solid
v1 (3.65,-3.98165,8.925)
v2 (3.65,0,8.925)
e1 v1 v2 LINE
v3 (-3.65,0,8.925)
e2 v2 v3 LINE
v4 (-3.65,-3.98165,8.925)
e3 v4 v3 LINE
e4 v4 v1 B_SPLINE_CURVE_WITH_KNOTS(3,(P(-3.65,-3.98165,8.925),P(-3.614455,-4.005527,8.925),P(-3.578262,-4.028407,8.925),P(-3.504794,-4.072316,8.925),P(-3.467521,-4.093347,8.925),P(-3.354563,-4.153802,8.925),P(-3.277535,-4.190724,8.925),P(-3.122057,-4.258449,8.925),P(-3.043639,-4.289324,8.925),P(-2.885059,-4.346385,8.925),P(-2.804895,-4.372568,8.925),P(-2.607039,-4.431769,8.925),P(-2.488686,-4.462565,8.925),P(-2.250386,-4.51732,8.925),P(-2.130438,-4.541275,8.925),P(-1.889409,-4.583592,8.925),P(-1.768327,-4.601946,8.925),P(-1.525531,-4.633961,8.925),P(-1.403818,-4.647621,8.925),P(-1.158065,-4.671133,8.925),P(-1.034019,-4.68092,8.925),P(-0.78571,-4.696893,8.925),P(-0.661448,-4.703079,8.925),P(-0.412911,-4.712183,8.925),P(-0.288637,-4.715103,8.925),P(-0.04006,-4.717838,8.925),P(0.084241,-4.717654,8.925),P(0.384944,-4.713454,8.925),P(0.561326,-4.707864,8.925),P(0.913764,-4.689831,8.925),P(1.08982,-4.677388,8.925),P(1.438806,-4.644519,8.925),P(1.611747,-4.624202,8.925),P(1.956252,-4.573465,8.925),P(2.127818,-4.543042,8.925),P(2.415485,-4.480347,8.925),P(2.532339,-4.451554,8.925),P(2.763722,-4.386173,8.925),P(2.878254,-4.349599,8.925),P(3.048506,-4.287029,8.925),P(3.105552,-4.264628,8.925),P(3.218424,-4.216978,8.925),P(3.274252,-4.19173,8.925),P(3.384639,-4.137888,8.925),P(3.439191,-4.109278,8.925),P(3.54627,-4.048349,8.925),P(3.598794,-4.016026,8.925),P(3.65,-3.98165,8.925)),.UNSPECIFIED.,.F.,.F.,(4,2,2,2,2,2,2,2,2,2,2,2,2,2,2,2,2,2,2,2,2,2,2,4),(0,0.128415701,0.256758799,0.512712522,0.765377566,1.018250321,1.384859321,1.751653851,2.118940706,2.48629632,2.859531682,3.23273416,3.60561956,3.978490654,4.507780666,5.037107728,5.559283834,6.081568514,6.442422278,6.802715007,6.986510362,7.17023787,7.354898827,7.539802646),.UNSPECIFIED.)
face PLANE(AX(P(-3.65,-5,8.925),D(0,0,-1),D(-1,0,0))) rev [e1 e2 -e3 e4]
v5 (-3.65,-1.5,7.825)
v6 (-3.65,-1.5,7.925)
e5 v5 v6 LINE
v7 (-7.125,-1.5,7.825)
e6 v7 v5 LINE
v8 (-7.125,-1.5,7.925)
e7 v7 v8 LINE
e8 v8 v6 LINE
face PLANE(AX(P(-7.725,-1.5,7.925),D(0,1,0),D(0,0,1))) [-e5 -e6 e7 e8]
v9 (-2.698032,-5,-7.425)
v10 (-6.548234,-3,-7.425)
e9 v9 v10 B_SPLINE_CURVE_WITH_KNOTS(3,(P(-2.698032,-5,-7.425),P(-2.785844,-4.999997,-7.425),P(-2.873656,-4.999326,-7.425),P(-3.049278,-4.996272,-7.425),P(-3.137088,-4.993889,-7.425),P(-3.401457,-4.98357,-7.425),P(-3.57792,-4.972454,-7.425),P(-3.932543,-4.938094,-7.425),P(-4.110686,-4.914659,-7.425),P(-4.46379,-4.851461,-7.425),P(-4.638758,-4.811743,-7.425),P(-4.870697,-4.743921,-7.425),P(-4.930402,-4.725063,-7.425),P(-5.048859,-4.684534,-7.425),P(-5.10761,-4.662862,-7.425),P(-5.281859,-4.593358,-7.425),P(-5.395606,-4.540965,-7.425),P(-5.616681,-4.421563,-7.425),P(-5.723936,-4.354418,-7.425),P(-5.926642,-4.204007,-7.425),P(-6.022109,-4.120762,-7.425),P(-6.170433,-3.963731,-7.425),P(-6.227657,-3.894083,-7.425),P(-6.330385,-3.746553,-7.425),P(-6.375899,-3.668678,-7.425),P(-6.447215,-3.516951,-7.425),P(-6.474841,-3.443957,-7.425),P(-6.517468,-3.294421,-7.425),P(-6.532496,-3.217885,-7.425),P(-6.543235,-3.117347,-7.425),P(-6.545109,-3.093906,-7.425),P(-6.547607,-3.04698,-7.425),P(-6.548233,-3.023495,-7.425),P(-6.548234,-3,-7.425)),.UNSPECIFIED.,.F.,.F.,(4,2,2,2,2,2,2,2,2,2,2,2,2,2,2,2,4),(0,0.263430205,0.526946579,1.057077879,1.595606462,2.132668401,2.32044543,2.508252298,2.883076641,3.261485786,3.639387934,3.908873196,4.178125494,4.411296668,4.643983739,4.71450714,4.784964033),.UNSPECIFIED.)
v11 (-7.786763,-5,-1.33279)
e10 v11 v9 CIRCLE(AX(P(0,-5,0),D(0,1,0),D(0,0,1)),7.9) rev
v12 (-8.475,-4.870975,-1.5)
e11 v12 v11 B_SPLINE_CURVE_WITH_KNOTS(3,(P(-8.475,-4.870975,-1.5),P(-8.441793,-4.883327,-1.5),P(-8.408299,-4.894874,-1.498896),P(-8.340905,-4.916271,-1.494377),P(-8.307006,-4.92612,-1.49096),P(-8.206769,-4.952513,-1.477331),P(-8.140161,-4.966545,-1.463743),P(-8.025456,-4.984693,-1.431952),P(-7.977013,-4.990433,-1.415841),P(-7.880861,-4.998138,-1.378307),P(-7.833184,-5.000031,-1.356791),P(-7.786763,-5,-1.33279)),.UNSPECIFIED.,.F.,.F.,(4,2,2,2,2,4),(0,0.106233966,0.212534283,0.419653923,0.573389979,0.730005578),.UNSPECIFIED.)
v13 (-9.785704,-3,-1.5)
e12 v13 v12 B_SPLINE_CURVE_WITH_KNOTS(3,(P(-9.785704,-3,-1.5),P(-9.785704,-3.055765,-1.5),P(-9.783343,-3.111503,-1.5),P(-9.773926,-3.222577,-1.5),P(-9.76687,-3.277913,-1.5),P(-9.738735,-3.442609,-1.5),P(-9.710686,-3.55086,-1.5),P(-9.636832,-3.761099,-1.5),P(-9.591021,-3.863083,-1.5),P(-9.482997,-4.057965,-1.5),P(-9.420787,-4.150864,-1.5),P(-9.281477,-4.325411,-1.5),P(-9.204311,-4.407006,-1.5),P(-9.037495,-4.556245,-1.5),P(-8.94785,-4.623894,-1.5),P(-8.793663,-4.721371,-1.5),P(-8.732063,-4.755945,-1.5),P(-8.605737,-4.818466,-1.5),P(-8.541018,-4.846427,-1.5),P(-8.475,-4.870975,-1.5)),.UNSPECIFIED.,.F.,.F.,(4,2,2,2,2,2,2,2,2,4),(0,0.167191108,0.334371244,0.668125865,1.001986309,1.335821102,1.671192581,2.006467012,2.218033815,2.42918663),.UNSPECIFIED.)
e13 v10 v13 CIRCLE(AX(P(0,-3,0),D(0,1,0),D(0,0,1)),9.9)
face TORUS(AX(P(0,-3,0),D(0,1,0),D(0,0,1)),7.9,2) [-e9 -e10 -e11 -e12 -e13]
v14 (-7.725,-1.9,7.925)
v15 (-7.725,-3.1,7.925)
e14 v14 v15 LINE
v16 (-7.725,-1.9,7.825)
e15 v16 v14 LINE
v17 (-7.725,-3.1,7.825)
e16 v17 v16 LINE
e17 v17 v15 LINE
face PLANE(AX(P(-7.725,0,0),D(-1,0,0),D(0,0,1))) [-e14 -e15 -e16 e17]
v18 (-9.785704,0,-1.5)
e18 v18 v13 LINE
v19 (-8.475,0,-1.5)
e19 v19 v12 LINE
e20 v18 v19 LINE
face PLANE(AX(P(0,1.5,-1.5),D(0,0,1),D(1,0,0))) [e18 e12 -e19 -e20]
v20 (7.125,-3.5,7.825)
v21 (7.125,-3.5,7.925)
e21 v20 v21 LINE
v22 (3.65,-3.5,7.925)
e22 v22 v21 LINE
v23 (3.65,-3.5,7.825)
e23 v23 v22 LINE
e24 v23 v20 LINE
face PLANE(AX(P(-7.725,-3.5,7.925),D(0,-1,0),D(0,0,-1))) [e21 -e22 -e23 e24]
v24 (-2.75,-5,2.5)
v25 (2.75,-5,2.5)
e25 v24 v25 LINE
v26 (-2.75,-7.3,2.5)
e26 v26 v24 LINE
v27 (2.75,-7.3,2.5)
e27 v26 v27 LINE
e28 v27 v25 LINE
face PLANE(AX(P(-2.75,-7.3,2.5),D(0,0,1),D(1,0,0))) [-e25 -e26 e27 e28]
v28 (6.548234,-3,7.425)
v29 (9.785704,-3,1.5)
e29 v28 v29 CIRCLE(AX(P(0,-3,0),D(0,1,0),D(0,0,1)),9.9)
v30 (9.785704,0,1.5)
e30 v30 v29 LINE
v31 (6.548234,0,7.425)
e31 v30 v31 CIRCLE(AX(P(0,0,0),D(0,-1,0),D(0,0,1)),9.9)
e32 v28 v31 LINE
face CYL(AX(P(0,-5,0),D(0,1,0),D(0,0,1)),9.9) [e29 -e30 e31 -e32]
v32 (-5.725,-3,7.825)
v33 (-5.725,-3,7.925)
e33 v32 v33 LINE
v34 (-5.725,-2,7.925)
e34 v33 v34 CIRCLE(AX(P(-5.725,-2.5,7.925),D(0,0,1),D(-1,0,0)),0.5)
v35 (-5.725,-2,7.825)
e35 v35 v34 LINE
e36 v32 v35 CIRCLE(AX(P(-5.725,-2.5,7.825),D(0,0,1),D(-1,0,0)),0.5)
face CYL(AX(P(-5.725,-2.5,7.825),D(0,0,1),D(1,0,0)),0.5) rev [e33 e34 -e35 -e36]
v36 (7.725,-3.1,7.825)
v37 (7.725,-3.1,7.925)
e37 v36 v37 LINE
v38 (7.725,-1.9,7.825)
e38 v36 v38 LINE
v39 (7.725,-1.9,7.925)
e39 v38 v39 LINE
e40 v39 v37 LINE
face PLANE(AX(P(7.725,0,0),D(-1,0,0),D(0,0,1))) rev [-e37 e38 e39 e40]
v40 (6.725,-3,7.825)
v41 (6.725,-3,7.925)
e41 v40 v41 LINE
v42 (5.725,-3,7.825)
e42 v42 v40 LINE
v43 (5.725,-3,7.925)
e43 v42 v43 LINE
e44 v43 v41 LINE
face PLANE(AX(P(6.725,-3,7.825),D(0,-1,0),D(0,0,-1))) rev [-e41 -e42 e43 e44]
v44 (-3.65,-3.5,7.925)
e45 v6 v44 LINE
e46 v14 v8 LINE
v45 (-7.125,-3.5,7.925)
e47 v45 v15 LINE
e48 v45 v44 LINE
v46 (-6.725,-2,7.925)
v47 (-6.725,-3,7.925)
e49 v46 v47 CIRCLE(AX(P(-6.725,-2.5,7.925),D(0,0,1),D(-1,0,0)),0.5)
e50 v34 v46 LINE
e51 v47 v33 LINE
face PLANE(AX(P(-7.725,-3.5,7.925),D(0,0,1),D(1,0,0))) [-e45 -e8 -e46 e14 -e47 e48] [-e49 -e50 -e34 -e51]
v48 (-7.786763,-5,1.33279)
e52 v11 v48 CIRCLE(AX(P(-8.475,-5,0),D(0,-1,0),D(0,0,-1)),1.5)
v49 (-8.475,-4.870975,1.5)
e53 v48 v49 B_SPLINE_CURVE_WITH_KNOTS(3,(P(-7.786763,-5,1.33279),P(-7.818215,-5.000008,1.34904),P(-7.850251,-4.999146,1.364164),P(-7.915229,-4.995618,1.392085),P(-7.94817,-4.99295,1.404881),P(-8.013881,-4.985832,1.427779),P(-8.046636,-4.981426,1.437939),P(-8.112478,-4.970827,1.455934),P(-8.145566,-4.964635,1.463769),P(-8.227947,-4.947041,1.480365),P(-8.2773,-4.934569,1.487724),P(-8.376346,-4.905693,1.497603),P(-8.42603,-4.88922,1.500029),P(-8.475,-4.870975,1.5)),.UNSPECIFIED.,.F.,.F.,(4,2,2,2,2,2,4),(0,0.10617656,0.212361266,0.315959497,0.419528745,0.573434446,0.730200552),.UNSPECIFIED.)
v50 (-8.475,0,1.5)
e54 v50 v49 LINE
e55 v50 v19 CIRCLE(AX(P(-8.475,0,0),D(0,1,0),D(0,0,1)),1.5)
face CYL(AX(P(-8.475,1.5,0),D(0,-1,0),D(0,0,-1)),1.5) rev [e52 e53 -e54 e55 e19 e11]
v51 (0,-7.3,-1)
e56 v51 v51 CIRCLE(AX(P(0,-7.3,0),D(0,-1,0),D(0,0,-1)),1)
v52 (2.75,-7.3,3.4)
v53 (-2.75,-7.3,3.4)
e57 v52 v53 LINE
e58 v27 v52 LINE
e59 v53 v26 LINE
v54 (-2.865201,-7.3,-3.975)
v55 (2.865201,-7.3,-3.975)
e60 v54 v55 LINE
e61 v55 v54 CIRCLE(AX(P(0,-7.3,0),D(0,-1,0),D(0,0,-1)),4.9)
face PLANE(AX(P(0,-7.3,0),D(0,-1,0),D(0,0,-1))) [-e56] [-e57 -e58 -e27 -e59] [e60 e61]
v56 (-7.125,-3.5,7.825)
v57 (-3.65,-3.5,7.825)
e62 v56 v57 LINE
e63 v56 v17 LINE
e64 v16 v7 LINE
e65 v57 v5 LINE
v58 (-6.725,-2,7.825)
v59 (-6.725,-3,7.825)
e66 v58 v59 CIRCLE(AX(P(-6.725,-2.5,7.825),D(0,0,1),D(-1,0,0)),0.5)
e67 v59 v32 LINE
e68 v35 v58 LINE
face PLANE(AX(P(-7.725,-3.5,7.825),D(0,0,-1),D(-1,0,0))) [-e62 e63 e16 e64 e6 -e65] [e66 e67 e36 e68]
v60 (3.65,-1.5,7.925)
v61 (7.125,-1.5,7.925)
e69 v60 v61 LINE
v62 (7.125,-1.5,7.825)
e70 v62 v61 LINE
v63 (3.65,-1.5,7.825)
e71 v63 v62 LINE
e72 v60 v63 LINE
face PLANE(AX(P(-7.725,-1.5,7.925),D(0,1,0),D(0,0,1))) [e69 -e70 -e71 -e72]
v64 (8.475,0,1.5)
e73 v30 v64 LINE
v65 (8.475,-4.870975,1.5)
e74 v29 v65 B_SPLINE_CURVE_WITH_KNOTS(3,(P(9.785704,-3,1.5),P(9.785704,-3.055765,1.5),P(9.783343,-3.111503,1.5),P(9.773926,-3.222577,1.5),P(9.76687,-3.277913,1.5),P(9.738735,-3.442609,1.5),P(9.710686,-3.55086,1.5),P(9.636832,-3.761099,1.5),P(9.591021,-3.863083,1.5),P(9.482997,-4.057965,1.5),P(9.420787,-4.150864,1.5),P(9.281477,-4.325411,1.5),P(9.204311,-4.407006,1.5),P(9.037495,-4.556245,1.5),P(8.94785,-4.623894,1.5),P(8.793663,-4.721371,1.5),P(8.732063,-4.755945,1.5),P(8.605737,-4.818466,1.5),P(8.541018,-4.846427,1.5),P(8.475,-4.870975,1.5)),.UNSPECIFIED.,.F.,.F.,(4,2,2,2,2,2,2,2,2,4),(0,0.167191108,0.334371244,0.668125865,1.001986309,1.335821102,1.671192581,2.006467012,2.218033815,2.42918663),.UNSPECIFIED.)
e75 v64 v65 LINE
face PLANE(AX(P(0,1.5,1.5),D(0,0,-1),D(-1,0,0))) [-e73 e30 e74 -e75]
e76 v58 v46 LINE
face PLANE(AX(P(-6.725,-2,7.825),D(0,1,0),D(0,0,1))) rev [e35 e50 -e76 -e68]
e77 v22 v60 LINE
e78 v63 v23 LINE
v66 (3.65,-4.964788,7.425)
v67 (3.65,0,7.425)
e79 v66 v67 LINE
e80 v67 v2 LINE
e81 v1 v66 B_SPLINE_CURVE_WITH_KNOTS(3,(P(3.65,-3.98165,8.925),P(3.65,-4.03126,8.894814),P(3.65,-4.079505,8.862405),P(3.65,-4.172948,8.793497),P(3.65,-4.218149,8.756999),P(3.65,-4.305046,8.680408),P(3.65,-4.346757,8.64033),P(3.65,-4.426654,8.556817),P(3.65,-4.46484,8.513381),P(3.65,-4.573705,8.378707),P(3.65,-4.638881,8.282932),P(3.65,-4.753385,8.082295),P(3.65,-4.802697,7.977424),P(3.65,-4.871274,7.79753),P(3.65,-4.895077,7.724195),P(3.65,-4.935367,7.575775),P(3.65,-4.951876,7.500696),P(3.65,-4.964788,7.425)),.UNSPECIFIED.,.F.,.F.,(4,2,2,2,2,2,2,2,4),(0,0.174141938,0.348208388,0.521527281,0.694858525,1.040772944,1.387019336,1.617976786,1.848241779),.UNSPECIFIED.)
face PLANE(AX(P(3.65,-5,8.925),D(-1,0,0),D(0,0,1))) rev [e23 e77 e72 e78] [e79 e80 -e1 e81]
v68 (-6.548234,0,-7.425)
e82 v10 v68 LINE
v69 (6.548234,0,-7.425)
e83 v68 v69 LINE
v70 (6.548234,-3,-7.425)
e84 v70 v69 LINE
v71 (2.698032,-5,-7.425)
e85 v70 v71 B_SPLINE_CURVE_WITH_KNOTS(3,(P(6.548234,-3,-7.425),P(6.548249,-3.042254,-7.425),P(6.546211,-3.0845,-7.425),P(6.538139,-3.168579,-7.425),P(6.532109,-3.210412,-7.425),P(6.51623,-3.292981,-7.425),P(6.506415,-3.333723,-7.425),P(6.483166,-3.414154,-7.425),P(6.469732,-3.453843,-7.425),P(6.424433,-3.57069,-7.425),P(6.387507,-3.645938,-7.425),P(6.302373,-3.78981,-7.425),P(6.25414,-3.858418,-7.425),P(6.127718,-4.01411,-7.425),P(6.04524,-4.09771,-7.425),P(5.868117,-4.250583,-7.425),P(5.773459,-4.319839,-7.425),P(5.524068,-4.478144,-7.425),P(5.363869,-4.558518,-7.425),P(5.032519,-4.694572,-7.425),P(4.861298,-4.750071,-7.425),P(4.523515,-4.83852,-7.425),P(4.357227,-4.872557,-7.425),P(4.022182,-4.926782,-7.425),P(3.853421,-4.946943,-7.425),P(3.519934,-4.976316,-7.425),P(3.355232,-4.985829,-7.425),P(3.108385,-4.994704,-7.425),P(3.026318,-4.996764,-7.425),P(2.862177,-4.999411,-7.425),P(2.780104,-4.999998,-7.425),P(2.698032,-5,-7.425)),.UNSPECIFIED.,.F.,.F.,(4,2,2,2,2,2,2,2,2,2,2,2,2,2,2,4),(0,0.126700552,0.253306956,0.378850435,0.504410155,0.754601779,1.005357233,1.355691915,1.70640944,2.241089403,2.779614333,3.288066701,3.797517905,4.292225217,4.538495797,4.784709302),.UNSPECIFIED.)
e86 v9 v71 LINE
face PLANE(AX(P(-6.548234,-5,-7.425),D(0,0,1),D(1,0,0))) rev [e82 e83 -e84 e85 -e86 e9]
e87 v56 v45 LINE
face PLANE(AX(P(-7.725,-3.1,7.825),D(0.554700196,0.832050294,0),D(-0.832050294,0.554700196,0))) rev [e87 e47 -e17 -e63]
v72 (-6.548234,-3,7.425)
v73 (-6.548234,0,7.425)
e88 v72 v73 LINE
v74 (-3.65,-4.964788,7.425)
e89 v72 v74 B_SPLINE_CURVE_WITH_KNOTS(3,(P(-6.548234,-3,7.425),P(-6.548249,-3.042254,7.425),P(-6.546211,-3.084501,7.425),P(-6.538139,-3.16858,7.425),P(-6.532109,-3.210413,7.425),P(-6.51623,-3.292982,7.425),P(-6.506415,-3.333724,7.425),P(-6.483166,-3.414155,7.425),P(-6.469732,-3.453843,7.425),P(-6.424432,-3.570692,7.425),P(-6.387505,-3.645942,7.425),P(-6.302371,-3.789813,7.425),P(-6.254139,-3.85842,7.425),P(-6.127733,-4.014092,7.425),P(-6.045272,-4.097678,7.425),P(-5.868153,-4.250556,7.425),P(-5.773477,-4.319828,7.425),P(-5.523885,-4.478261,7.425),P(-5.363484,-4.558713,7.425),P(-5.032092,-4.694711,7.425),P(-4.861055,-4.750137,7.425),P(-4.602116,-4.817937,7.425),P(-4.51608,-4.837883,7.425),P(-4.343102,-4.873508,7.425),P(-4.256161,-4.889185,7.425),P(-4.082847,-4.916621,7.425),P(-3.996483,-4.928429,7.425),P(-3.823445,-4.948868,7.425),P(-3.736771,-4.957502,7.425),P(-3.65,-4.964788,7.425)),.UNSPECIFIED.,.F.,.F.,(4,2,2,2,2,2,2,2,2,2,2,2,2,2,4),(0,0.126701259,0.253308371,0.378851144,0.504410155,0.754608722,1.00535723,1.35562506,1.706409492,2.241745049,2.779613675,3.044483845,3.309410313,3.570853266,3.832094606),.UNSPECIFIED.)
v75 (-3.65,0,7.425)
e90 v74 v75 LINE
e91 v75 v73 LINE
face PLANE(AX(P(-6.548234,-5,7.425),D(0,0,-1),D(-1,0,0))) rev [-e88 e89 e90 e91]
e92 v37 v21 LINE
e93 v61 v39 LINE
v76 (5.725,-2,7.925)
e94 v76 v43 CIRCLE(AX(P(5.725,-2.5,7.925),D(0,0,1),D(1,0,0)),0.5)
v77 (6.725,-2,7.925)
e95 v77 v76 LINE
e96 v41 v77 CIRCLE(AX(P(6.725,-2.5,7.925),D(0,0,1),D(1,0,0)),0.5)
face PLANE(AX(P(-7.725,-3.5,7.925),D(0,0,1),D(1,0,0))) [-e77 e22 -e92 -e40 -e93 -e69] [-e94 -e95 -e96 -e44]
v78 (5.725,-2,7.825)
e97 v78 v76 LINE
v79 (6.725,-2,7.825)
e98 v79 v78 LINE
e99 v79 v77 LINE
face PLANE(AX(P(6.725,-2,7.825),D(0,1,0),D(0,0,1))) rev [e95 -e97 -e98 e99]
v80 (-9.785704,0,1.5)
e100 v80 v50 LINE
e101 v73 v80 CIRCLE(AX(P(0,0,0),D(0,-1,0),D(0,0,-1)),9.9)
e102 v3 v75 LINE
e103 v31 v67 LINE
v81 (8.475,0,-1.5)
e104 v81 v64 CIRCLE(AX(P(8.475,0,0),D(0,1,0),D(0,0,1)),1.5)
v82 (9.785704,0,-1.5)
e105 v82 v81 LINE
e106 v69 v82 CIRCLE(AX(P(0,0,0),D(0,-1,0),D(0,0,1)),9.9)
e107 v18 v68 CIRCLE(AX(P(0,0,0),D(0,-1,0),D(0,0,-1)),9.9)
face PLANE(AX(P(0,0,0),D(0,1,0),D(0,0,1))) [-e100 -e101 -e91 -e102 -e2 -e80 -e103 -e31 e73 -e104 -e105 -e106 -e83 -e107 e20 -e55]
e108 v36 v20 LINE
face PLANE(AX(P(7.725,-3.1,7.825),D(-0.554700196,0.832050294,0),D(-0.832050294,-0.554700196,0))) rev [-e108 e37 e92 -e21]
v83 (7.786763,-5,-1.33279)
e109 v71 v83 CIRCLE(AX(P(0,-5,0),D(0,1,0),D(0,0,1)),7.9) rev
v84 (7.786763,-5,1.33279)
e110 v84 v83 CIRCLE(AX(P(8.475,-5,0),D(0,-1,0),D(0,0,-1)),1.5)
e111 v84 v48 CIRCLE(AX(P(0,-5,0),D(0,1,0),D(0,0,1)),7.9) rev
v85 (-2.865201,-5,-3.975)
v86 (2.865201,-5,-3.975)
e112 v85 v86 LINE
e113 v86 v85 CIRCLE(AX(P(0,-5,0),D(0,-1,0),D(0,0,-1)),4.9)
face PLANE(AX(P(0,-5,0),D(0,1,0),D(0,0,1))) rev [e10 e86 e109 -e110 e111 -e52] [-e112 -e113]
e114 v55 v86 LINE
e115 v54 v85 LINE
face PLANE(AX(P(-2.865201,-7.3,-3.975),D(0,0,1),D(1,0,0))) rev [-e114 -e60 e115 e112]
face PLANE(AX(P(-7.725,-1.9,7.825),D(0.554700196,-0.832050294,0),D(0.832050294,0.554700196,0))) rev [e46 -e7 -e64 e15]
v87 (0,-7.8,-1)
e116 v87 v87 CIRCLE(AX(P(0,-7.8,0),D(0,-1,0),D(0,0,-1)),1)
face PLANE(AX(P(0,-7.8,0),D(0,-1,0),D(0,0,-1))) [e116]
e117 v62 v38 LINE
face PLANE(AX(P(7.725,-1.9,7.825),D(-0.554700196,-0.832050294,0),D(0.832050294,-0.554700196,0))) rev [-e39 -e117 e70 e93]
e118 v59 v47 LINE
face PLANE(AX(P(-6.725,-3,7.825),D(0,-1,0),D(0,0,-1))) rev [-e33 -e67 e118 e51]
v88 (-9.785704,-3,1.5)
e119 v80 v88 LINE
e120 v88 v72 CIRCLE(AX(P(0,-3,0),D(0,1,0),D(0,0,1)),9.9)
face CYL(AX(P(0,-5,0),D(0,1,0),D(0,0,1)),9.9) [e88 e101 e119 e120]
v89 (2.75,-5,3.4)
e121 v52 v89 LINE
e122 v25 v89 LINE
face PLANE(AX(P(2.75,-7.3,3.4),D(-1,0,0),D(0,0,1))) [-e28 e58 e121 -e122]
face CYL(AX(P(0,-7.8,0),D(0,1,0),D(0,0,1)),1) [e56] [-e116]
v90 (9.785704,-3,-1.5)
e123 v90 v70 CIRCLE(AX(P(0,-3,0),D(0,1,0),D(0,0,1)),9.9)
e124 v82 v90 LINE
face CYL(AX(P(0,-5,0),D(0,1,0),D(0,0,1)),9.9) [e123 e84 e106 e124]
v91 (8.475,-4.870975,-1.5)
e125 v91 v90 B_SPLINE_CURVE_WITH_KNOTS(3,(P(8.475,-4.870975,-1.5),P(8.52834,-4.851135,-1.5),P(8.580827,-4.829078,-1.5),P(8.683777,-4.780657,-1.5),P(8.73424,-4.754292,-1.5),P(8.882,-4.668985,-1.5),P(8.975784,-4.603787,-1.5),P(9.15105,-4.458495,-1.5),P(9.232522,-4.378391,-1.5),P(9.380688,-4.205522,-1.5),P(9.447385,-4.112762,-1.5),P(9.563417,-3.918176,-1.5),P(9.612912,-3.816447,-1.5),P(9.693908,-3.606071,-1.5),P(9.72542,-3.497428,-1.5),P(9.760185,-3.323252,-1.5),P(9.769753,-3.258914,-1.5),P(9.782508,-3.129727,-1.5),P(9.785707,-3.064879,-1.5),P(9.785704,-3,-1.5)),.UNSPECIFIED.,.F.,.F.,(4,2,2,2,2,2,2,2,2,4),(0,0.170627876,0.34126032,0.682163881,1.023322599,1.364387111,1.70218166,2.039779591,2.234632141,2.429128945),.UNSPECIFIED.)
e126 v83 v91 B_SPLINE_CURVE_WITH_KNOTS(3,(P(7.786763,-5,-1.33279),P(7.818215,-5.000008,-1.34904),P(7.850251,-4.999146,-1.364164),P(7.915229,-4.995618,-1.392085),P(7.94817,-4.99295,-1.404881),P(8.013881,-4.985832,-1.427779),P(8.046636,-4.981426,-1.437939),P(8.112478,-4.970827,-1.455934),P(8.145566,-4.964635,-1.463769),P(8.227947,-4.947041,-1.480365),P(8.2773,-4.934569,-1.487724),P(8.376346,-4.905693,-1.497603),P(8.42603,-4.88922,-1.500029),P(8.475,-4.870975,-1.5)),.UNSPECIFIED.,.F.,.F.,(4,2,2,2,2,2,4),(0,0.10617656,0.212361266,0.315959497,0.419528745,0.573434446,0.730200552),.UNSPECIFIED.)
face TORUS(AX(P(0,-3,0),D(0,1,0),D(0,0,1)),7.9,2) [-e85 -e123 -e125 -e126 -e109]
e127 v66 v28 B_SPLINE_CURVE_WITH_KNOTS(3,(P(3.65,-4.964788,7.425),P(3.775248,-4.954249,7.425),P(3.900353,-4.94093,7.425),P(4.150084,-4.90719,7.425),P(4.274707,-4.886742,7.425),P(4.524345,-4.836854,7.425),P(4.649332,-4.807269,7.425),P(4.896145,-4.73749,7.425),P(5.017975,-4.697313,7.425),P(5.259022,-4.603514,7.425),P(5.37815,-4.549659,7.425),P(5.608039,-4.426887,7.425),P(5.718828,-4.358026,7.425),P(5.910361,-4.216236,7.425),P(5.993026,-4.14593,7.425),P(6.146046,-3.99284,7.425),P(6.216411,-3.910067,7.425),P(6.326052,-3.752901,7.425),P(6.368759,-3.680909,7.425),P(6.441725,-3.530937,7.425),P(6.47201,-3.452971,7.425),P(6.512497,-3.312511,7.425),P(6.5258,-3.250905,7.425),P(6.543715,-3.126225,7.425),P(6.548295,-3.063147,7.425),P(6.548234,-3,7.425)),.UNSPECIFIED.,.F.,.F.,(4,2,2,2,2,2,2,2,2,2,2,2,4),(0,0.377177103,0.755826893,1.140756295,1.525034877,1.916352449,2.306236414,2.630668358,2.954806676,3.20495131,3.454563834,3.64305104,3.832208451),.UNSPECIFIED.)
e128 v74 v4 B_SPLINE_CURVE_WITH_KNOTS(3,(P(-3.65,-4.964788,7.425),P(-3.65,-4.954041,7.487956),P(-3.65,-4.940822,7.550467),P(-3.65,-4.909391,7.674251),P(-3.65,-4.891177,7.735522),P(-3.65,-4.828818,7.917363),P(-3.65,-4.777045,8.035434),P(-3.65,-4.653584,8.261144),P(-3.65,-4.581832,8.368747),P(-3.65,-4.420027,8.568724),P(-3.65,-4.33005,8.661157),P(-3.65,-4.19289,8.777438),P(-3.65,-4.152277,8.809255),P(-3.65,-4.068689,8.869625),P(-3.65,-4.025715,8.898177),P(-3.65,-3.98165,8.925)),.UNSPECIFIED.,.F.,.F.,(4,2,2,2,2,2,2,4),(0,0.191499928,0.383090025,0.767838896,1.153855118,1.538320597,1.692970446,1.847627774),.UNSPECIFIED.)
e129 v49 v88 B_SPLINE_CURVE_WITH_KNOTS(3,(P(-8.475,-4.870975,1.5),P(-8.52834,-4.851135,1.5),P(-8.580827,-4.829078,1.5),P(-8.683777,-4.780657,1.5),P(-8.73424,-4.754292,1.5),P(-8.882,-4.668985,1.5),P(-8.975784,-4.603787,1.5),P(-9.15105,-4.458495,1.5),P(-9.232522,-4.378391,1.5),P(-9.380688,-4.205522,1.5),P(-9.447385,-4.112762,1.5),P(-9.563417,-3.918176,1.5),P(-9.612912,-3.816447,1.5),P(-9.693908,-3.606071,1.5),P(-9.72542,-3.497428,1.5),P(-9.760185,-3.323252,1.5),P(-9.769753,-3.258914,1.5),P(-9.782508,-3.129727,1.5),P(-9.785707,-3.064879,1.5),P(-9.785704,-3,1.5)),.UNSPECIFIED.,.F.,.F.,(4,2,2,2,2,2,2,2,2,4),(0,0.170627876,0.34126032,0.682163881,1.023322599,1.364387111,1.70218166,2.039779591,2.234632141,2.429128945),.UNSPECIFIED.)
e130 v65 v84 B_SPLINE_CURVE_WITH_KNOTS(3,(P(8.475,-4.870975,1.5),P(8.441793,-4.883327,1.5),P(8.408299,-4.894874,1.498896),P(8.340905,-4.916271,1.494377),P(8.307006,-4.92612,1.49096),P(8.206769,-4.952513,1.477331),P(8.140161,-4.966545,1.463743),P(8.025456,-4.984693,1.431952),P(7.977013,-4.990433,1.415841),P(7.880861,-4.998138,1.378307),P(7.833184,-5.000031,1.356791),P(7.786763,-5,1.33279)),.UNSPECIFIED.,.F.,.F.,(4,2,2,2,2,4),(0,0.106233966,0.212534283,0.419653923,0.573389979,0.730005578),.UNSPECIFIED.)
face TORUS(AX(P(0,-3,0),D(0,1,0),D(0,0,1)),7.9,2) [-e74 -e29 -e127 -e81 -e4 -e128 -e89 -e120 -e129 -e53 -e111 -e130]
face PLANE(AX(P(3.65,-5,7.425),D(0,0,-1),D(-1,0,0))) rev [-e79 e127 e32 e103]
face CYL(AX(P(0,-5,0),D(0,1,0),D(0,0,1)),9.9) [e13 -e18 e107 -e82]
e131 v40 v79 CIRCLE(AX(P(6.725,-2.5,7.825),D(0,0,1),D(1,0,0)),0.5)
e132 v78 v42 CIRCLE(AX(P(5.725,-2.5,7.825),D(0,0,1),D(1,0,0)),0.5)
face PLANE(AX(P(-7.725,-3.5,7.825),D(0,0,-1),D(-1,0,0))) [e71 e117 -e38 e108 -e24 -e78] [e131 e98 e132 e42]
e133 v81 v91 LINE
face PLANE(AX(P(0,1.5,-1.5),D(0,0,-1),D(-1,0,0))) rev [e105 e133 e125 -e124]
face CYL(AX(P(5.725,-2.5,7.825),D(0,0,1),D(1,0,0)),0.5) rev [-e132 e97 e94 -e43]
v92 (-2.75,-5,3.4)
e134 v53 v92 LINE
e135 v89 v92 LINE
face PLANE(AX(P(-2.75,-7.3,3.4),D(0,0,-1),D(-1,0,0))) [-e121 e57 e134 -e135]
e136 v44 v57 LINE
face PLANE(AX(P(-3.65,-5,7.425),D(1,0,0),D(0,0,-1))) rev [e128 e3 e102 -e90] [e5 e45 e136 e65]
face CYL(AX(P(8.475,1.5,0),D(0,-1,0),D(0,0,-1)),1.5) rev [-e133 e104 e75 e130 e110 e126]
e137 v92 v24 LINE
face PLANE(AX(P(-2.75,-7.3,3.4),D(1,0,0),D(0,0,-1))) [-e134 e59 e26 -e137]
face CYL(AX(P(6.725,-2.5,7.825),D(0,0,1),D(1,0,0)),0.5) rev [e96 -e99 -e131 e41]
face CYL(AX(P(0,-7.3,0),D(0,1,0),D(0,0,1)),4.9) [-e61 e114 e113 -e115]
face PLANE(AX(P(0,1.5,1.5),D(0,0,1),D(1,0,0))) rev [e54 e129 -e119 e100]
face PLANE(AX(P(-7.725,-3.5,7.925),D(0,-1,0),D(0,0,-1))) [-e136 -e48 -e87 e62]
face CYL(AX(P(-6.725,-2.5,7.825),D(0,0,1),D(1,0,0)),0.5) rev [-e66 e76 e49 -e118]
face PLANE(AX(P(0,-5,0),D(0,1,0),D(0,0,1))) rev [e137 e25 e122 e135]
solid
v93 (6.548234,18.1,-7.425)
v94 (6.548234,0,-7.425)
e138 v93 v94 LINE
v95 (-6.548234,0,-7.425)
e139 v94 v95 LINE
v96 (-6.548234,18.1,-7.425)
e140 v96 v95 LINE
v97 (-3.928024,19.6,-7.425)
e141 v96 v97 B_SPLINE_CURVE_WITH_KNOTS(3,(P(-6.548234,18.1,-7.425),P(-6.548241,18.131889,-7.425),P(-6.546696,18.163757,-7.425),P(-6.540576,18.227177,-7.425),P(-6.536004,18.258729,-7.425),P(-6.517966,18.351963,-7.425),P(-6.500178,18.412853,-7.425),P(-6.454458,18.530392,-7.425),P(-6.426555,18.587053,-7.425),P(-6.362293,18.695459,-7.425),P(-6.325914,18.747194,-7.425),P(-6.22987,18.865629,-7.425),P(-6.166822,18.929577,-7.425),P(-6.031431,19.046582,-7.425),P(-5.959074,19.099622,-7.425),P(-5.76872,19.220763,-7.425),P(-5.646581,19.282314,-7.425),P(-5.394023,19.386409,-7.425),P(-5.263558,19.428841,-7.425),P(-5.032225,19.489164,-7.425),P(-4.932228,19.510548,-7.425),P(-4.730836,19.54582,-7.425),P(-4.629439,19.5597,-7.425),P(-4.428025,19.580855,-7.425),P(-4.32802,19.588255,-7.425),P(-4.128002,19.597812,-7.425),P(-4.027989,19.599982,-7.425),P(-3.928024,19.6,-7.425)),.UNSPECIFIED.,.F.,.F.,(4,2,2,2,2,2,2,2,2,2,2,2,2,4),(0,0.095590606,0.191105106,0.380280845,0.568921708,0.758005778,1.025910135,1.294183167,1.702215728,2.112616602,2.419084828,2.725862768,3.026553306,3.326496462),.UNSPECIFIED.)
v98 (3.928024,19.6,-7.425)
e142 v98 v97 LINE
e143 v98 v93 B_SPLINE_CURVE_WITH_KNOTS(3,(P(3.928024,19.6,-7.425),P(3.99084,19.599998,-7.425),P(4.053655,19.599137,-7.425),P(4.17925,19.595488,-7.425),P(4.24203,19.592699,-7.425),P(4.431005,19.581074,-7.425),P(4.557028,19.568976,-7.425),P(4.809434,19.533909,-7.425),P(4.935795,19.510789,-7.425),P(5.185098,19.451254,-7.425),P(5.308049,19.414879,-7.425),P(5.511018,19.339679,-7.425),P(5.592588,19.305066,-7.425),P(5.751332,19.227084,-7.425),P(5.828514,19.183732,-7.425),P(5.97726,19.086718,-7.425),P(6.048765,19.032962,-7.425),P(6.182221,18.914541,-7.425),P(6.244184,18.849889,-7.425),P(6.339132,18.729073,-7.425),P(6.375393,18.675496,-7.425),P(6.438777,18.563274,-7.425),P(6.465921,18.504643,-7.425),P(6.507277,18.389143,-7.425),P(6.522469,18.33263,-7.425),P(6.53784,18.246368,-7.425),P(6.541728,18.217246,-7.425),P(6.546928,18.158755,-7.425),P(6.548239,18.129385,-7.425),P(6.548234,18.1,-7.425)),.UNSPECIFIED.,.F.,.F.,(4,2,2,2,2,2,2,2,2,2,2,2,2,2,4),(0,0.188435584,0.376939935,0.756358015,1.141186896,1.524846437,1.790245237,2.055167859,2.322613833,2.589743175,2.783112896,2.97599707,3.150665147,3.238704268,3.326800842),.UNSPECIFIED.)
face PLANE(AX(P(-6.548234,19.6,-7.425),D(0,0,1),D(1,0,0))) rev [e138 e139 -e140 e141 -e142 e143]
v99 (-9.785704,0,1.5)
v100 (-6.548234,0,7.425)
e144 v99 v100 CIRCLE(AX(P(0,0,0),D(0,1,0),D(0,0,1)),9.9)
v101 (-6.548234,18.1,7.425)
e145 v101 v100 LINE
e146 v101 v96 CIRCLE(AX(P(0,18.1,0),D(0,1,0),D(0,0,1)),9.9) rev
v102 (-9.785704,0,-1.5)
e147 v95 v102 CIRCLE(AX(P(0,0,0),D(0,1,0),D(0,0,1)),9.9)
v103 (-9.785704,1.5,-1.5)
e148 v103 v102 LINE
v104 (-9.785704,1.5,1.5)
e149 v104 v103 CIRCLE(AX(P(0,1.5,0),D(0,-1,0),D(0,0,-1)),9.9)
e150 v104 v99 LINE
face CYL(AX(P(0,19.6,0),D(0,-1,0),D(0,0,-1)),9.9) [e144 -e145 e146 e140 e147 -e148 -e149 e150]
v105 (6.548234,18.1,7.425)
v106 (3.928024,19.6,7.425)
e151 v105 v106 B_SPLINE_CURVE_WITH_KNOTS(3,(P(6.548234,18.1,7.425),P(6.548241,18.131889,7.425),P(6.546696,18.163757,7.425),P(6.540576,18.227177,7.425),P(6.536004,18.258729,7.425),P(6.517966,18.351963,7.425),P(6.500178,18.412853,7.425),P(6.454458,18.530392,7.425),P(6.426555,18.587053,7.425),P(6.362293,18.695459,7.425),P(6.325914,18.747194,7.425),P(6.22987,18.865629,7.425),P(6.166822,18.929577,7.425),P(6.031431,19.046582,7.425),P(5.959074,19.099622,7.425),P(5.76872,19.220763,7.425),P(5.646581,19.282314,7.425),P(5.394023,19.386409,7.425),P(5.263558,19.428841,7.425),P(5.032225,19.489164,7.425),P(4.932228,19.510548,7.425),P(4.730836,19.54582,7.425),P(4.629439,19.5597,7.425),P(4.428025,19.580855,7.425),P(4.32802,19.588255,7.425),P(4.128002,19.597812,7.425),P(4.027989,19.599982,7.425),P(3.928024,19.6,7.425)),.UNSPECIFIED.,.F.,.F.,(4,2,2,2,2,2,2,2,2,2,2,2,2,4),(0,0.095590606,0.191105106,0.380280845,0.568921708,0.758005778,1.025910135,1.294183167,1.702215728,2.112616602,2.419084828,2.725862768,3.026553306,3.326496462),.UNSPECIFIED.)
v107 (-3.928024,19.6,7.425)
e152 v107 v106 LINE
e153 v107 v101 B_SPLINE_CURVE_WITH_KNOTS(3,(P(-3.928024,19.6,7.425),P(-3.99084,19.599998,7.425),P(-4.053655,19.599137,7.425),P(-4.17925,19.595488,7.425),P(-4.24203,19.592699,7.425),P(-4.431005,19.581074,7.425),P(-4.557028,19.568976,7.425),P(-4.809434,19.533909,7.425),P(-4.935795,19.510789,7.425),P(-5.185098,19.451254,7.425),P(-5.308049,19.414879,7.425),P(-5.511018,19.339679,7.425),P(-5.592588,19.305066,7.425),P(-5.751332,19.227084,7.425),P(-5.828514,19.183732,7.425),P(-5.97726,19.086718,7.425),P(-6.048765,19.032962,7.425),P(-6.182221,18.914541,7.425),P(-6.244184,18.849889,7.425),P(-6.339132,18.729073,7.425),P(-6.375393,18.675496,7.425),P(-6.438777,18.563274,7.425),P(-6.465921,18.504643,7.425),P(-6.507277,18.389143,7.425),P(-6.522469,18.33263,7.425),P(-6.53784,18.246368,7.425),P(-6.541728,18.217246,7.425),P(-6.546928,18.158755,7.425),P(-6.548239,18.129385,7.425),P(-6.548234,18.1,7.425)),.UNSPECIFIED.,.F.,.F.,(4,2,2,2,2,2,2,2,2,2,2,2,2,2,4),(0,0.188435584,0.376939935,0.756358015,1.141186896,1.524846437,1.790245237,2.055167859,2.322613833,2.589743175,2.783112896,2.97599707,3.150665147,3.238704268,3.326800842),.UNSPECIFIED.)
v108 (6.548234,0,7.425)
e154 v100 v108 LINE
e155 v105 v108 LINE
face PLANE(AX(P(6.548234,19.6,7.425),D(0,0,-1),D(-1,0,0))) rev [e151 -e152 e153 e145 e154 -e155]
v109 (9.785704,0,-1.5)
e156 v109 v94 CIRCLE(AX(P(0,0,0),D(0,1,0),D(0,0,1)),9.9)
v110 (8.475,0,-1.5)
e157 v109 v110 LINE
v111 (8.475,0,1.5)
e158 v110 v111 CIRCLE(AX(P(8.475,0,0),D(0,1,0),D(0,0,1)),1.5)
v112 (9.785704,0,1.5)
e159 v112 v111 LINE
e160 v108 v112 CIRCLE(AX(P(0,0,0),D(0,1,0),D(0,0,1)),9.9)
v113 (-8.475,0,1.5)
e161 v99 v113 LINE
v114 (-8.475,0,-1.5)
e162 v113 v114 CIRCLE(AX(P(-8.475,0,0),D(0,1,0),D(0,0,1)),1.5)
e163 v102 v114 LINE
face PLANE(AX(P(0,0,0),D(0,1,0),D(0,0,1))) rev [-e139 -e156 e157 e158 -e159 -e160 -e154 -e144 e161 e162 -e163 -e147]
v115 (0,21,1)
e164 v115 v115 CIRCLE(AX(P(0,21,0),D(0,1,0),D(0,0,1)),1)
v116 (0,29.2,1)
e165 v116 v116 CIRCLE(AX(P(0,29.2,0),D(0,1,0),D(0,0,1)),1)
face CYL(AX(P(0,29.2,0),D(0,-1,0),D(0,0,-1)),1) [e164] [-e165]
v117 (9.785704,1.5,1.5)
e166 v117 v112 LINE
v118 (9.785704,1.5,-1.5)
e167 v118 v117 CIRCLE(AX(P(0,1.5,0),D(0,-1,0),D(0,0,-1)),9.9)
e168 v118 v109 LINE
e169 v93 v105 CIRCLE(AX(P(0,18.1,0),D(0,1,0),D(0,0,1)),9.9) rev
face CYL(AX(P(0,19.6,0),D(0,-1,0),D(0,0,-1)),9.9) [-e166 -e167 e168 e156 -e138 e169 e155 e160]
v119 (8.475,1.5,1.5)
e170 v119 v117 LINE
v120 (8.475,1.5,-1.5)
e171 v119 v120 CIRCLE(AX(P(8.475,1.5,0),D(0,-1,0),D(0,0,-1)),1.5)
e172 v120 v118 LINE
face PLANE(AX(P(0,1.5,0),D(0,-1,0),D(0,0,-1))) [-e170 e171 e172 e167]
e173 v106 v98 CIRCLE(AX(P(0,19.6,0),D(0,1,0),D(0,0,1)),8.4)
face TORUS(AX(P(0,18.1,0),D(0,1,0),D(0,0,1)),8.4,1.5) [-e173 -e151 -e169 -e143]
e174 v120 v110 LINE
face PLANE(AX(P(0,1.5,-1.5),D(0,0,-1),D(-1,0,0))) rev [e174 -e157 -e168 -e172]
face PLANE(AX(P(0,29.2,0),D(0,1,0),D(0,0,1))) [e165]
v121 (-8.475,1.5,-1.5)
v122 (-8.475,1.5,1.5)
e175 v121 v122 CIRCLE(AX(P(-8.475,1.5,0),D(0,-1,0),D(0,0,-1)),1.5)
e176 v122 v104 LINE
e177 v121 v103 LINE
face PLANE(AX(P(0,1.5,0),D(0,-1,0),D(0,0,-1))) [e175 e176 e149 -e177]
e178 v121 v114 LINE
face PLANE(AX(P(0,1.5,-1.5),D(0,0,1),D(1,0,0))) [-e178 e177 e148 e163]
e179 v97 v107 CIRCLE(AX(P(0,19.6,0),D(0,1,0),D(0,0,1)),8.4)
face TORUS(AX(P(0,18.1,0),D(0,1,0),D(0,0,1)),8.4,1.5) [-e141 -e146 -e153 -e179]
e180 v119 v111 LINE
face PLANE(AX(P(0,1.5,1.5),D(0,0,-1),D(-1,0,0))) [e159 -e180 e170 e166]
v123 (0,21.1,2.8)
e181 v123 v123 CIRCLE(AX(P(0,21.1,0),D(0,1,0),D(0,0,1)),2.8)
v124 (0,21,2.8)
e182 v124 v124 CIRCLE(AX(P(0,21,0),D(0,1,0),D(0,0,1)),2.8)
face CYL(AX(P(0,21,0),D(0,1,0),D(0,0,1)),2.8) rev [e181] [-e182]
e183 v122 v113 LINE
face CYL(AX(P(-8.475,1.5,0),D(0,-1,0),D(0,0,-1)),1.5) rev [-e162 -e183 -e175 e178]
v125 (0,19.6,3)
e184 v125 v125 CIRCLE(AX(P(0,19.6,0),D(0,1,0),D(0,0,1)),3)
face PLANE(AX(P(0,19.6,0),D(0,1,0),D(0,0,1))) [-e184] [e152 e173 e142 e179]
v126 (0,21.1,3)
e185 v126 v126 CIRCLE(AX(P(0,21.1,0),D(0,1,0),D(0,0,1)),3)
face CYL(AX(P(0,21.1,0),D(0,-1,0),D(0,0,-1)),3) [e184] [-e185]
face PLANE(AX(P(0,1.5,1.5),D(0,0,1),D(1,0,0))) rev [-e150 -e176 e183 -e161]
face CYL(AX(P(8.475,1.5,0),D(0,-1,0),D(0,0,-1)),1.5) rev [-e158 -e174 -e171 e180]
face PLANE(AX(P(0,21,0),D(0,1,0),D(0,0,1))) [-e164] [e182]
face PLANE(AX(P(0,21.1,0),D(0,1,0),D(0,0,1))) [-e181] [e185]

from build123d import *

# Parameters (mm, degrees)
BOSS_EXTRUDE1_DEPTH      = 19.6
BOSS_EXTRUDE2_DEPTH      = 5
SKETCH3_W                = 5.5
SKETCH3_H                = 0.9
BOSS_EXTRUDE3_DEPTH      = 2.3
SKETCH4_R                = 1
BOSS_EXTRUDE4_DEPTH      = 0.5
CUT_EXTRUDE1_DEPTH       = 6.5
BOSS_EXTRUDE5_DEPTH      = 7.725
BOSS_EXTRUDE5_DEPTH_BACK = 7.725
SKETCH7_W                = 0.1
SKETCH7_H                = 2
CUT_EXTRUDE2_DEPTH       = 0.1
SKETCH9_R                = 3
BOSS_EXTRUDE6_DEPTH      = 1.5
SKETCH10_R               = 2.8
CUT_EXTRUDE3_DEPTH       = 0.1
SKETCH11_R               = 1
BOSS_EXTRUDE7_DEPTH      = 8.2
FILLET2_R                = 1.5


with BuildPart() as part:
    # Sketch1 → Boss-Extrude1 (new body)
    with BuildSketch(Plane(origin=(0, 0, 0), x_dir=(1, 0, 0), z_dir=(0, 1, 0))):
        with BuildLine():
            Line((-6.548234495, 7.425), (6.548234495, 7.425))
            ThreePointArc((6.548234495, 7.425), (9.9, 0), (6.548234495, -7.425))
            Line((6.548234495, -7.425), (-6.548234495, -7.425))
            ThreePointArc((-6.548234495, -7.425), (-9.9, 0), (-6.548234495, 7.425))
        make_face()
    extrude(amount=BOSS_EXTRUDE1_DEPTH)


with BuildPart() as body_2:
    # Sketch2 → Boss-Extrude2 (new body)
    with BuildSketch(Plane.XZ):
        with BuildLine():
            Line((-6.548234495, -7.425), (6.548234495, -7.425))
            ThreePointArc((6.548234495, -7.425), (9.9, 0), (6.548234495, 7.425))
            Line((6.548234495, 7.425), (3.65, 7.425))
            Line((3.65, 7.425), (3.65, 8.925))
            Line((3.65, 8.925), (-3.65, 8.925))
            Line((-3.65, 8.925), (-3.65, 7.425))
            Line((-3.65, 7.425), (-6.548234495, 7.425))
            ThreePointArc((-6.548234495, 7.425), (-9.9, 0), (-6.548234495, -7.425))
        make_face()
    extrude(amount=BOSS_EXTRUDE2_DEPTH)

    # Sketch3 → Boss-Extrude3 (add)
    with BuildSketch(Plane.XZ.offset(5)):
        with BuildLine():
            Line((-2.865200691, -3.975), (2.865200691, -3.975))
            ThreePointArc((2.865200691, -3.975), (0, 4.9), (-2.865200691, -3.975))
        make_face()
        with Locations((0, 2.95)):
            Rectangle(SKETCH3_W, SKETCH3_H, mode=Mode.SUBTRACT)
    extrude(amount=BOSS_EXTRUDE3_DEPTH)

    # Sketch4 → Boss-Extrude4 (add)
    with BuildSketch(Plane.XZ.offset(7.3)):
        with Locations(Location((0, 0, 0), (0, 0, 270))):
            Circle(SKETCH4_R)
    extrude(amount=BOSS_EXTRUDE4_DEPTH)


with BuildPart() as cut_extrude1_tool:
    # Sketch5 → Cut-Extrude1 (new body)
    with BuildSketch(Plane.XZ.offset(5)):
        with BuildLine():
            ThreePointArc((-8.475, -1.5), (-6.975, 0), (-8.475, 1.5))
            Line((-8.475, 1.5), (-9.785703858, 1.5))
            ThreePointArc((-9.785703858, 1.5), (-9.9, 0), (-9.785703858, -1.5))
            Line((-9.785703858, -1.5), (-8.475, -1.5))
        make_face()
        with BuildLine():
            Line((9.785703858, 1.5), (8.475, 1.5))
            ThreePointArc((8.475, 1.5), (6.975, 0), (8.475, -1.5))
            Line((8.475, -1.5), (9.785703858, -1.5))
            ThreePointArc((9.785703858, -1.5), (9.9, 0), (9.785703858, 1.5))
        make_face()
    extrude(amount=-CUT_EXTRUDE1_DEPTH)


with BuildPart() as part_1:
    add(part.part)

    # Cut-Extrude1: cut by cut_extrude1_tool
    add(cut_extrude1_tool.part, mode=Mode.SUBTRACT)

    # Sketch9 → Boss-Extrude6 (add)
    with BuildSketch(Plane(origin=(0, 19.6, 0), x_dir=(1, 0, 0), z_dir=(0, 1, 0))):
        with Locations(Location((0, 0, 0), (0, 0, 270))):
            Circle(SKETCH9_R)
    extrude(amount=BOSS_EXTRUDE6_DEPTH)

    # Sketch10 → Cut-Extrude3 (cut)
    with BuildSketch(Plane(origin=(0, 21.1, 0), x_dir=(1, 0, 0), z_dir=(0, 1, 0))):
        with Locations(Location((0, 0, 0), (0, 0, 270))):
            Circle(SKETCH10_R)
    extrude(amount=-CUT_EXTRUDE3_DEPTH, mode=Mode.SUBTRACT)

    # Sketch11 → Boss-Extrude7 (add)
    with BuildSketch(Plane(origin=(0, 21, 0), x_dir=(1, 0, 0), z_dir=(0, 1, 0))):
        with Locations(Location((0, 0, 0), (0, 0, 90))):
            Circle(SKETCH11_R)
    extrude(amount=BOSS_EXTRUDE7_DEPTH)

    # Fillet2
    fillet2_edges = [part_1.edges().sort_by_distance(p)[0] for p in [
        (9.9, 19.6, 0),
        (-9.9, 19.6, 0),
    ]]
    fillet(fillet2_edges, radius=FILLET2_R)


with BuildPart() as body_2_1:
    add(body_2.part)

    # Cut-Extrude1: cut by cut_extrude1_tool
    add(cut_extrude1_tool.part, mode=Mode.SUBTRACT)

    # Fillet1: read off the stored shape, not the designer's step
    # Fillet1 outline → Fillet1 (revolve, cut)
    with BuildSketch(Plane.XY):
        with BuildLine():
            ThreePointArc((9.9, -3), (9.314213562, -4.414213562), (7.9, -5))
            Line((7.9, -5), (9.9, -5))
            Line((9.9, -5), (9.9, -3))
        make_face()
    revolve(axis=Axis((0, 0, 0), (0, 1, 0)), mode=Mode.SUBTRACT)

    # Sketch7 → Boss-Extrude5 (add, two sides: drawn at the far end of the back side and taken through both)
    with BuildSketch(Plane(origin=(0, 0, 0), x_dir=(0, 0, -1), z_dir=(1, 0, 0)).offset(-BOSS_EXTRUDE5_DEPTH_BACK)):
        with Locations((-7.875, -2.5)):
            Rectangle(SKETCH7_W, SKETCH7_H)
    extrude(amount=BOSS_EXTRUDE5_DEPTH + BOSS_EXTRUDE5_DEPTH_BACK)

    # Sketch8 → Cut-Extrude2 (cut)
    with BuildSketch(Plane.XY.offset(7.925)):
        with BuildLine():
            Line((6.725, -3), (5.725, -3))
            ThreePointArc((5.725, -3), (5.225, -2.5), (5.725, -2))
            Line((5.725, -2), (6.725, -2))
            ThreePointArc((6.725, -2), (7.225, -2.5), (6.725, -3))
        make_face()
        Polygon((7.725, -1.9), (7.125, -1.5), (7.725, -1.5), align=None)
        Polygon((7.725, -3.5), (7.725, -3.1), (7.125, -3.5), align=None)
        with BuildLine():
            Line((-6.725, -3), (-5.725, -3))
            ThreePointArc((-5.725, -3), (-5.225, -2.5), (-5.725, -2))
            Line((-5.725, -2), (-6.725, -2))
            ThreePointArc((-6.725, -2), (-7.225, -2.5), (-6.725, -3))
        make_face()
        Polygon((-7.725, -3.1), (-7.125, -3.5), (-7.725, -3.5), align=None)
        Polygon((-7.725, -1.5), (-7.725, -1.9), (-7.125, -1.5), align=None)
    extrude(amount=-CUT_EXTRUDE2_DEPTH, mode=Mode.SUBTRACT)


solid = Compound([part_1.part, body_2_1.part])
